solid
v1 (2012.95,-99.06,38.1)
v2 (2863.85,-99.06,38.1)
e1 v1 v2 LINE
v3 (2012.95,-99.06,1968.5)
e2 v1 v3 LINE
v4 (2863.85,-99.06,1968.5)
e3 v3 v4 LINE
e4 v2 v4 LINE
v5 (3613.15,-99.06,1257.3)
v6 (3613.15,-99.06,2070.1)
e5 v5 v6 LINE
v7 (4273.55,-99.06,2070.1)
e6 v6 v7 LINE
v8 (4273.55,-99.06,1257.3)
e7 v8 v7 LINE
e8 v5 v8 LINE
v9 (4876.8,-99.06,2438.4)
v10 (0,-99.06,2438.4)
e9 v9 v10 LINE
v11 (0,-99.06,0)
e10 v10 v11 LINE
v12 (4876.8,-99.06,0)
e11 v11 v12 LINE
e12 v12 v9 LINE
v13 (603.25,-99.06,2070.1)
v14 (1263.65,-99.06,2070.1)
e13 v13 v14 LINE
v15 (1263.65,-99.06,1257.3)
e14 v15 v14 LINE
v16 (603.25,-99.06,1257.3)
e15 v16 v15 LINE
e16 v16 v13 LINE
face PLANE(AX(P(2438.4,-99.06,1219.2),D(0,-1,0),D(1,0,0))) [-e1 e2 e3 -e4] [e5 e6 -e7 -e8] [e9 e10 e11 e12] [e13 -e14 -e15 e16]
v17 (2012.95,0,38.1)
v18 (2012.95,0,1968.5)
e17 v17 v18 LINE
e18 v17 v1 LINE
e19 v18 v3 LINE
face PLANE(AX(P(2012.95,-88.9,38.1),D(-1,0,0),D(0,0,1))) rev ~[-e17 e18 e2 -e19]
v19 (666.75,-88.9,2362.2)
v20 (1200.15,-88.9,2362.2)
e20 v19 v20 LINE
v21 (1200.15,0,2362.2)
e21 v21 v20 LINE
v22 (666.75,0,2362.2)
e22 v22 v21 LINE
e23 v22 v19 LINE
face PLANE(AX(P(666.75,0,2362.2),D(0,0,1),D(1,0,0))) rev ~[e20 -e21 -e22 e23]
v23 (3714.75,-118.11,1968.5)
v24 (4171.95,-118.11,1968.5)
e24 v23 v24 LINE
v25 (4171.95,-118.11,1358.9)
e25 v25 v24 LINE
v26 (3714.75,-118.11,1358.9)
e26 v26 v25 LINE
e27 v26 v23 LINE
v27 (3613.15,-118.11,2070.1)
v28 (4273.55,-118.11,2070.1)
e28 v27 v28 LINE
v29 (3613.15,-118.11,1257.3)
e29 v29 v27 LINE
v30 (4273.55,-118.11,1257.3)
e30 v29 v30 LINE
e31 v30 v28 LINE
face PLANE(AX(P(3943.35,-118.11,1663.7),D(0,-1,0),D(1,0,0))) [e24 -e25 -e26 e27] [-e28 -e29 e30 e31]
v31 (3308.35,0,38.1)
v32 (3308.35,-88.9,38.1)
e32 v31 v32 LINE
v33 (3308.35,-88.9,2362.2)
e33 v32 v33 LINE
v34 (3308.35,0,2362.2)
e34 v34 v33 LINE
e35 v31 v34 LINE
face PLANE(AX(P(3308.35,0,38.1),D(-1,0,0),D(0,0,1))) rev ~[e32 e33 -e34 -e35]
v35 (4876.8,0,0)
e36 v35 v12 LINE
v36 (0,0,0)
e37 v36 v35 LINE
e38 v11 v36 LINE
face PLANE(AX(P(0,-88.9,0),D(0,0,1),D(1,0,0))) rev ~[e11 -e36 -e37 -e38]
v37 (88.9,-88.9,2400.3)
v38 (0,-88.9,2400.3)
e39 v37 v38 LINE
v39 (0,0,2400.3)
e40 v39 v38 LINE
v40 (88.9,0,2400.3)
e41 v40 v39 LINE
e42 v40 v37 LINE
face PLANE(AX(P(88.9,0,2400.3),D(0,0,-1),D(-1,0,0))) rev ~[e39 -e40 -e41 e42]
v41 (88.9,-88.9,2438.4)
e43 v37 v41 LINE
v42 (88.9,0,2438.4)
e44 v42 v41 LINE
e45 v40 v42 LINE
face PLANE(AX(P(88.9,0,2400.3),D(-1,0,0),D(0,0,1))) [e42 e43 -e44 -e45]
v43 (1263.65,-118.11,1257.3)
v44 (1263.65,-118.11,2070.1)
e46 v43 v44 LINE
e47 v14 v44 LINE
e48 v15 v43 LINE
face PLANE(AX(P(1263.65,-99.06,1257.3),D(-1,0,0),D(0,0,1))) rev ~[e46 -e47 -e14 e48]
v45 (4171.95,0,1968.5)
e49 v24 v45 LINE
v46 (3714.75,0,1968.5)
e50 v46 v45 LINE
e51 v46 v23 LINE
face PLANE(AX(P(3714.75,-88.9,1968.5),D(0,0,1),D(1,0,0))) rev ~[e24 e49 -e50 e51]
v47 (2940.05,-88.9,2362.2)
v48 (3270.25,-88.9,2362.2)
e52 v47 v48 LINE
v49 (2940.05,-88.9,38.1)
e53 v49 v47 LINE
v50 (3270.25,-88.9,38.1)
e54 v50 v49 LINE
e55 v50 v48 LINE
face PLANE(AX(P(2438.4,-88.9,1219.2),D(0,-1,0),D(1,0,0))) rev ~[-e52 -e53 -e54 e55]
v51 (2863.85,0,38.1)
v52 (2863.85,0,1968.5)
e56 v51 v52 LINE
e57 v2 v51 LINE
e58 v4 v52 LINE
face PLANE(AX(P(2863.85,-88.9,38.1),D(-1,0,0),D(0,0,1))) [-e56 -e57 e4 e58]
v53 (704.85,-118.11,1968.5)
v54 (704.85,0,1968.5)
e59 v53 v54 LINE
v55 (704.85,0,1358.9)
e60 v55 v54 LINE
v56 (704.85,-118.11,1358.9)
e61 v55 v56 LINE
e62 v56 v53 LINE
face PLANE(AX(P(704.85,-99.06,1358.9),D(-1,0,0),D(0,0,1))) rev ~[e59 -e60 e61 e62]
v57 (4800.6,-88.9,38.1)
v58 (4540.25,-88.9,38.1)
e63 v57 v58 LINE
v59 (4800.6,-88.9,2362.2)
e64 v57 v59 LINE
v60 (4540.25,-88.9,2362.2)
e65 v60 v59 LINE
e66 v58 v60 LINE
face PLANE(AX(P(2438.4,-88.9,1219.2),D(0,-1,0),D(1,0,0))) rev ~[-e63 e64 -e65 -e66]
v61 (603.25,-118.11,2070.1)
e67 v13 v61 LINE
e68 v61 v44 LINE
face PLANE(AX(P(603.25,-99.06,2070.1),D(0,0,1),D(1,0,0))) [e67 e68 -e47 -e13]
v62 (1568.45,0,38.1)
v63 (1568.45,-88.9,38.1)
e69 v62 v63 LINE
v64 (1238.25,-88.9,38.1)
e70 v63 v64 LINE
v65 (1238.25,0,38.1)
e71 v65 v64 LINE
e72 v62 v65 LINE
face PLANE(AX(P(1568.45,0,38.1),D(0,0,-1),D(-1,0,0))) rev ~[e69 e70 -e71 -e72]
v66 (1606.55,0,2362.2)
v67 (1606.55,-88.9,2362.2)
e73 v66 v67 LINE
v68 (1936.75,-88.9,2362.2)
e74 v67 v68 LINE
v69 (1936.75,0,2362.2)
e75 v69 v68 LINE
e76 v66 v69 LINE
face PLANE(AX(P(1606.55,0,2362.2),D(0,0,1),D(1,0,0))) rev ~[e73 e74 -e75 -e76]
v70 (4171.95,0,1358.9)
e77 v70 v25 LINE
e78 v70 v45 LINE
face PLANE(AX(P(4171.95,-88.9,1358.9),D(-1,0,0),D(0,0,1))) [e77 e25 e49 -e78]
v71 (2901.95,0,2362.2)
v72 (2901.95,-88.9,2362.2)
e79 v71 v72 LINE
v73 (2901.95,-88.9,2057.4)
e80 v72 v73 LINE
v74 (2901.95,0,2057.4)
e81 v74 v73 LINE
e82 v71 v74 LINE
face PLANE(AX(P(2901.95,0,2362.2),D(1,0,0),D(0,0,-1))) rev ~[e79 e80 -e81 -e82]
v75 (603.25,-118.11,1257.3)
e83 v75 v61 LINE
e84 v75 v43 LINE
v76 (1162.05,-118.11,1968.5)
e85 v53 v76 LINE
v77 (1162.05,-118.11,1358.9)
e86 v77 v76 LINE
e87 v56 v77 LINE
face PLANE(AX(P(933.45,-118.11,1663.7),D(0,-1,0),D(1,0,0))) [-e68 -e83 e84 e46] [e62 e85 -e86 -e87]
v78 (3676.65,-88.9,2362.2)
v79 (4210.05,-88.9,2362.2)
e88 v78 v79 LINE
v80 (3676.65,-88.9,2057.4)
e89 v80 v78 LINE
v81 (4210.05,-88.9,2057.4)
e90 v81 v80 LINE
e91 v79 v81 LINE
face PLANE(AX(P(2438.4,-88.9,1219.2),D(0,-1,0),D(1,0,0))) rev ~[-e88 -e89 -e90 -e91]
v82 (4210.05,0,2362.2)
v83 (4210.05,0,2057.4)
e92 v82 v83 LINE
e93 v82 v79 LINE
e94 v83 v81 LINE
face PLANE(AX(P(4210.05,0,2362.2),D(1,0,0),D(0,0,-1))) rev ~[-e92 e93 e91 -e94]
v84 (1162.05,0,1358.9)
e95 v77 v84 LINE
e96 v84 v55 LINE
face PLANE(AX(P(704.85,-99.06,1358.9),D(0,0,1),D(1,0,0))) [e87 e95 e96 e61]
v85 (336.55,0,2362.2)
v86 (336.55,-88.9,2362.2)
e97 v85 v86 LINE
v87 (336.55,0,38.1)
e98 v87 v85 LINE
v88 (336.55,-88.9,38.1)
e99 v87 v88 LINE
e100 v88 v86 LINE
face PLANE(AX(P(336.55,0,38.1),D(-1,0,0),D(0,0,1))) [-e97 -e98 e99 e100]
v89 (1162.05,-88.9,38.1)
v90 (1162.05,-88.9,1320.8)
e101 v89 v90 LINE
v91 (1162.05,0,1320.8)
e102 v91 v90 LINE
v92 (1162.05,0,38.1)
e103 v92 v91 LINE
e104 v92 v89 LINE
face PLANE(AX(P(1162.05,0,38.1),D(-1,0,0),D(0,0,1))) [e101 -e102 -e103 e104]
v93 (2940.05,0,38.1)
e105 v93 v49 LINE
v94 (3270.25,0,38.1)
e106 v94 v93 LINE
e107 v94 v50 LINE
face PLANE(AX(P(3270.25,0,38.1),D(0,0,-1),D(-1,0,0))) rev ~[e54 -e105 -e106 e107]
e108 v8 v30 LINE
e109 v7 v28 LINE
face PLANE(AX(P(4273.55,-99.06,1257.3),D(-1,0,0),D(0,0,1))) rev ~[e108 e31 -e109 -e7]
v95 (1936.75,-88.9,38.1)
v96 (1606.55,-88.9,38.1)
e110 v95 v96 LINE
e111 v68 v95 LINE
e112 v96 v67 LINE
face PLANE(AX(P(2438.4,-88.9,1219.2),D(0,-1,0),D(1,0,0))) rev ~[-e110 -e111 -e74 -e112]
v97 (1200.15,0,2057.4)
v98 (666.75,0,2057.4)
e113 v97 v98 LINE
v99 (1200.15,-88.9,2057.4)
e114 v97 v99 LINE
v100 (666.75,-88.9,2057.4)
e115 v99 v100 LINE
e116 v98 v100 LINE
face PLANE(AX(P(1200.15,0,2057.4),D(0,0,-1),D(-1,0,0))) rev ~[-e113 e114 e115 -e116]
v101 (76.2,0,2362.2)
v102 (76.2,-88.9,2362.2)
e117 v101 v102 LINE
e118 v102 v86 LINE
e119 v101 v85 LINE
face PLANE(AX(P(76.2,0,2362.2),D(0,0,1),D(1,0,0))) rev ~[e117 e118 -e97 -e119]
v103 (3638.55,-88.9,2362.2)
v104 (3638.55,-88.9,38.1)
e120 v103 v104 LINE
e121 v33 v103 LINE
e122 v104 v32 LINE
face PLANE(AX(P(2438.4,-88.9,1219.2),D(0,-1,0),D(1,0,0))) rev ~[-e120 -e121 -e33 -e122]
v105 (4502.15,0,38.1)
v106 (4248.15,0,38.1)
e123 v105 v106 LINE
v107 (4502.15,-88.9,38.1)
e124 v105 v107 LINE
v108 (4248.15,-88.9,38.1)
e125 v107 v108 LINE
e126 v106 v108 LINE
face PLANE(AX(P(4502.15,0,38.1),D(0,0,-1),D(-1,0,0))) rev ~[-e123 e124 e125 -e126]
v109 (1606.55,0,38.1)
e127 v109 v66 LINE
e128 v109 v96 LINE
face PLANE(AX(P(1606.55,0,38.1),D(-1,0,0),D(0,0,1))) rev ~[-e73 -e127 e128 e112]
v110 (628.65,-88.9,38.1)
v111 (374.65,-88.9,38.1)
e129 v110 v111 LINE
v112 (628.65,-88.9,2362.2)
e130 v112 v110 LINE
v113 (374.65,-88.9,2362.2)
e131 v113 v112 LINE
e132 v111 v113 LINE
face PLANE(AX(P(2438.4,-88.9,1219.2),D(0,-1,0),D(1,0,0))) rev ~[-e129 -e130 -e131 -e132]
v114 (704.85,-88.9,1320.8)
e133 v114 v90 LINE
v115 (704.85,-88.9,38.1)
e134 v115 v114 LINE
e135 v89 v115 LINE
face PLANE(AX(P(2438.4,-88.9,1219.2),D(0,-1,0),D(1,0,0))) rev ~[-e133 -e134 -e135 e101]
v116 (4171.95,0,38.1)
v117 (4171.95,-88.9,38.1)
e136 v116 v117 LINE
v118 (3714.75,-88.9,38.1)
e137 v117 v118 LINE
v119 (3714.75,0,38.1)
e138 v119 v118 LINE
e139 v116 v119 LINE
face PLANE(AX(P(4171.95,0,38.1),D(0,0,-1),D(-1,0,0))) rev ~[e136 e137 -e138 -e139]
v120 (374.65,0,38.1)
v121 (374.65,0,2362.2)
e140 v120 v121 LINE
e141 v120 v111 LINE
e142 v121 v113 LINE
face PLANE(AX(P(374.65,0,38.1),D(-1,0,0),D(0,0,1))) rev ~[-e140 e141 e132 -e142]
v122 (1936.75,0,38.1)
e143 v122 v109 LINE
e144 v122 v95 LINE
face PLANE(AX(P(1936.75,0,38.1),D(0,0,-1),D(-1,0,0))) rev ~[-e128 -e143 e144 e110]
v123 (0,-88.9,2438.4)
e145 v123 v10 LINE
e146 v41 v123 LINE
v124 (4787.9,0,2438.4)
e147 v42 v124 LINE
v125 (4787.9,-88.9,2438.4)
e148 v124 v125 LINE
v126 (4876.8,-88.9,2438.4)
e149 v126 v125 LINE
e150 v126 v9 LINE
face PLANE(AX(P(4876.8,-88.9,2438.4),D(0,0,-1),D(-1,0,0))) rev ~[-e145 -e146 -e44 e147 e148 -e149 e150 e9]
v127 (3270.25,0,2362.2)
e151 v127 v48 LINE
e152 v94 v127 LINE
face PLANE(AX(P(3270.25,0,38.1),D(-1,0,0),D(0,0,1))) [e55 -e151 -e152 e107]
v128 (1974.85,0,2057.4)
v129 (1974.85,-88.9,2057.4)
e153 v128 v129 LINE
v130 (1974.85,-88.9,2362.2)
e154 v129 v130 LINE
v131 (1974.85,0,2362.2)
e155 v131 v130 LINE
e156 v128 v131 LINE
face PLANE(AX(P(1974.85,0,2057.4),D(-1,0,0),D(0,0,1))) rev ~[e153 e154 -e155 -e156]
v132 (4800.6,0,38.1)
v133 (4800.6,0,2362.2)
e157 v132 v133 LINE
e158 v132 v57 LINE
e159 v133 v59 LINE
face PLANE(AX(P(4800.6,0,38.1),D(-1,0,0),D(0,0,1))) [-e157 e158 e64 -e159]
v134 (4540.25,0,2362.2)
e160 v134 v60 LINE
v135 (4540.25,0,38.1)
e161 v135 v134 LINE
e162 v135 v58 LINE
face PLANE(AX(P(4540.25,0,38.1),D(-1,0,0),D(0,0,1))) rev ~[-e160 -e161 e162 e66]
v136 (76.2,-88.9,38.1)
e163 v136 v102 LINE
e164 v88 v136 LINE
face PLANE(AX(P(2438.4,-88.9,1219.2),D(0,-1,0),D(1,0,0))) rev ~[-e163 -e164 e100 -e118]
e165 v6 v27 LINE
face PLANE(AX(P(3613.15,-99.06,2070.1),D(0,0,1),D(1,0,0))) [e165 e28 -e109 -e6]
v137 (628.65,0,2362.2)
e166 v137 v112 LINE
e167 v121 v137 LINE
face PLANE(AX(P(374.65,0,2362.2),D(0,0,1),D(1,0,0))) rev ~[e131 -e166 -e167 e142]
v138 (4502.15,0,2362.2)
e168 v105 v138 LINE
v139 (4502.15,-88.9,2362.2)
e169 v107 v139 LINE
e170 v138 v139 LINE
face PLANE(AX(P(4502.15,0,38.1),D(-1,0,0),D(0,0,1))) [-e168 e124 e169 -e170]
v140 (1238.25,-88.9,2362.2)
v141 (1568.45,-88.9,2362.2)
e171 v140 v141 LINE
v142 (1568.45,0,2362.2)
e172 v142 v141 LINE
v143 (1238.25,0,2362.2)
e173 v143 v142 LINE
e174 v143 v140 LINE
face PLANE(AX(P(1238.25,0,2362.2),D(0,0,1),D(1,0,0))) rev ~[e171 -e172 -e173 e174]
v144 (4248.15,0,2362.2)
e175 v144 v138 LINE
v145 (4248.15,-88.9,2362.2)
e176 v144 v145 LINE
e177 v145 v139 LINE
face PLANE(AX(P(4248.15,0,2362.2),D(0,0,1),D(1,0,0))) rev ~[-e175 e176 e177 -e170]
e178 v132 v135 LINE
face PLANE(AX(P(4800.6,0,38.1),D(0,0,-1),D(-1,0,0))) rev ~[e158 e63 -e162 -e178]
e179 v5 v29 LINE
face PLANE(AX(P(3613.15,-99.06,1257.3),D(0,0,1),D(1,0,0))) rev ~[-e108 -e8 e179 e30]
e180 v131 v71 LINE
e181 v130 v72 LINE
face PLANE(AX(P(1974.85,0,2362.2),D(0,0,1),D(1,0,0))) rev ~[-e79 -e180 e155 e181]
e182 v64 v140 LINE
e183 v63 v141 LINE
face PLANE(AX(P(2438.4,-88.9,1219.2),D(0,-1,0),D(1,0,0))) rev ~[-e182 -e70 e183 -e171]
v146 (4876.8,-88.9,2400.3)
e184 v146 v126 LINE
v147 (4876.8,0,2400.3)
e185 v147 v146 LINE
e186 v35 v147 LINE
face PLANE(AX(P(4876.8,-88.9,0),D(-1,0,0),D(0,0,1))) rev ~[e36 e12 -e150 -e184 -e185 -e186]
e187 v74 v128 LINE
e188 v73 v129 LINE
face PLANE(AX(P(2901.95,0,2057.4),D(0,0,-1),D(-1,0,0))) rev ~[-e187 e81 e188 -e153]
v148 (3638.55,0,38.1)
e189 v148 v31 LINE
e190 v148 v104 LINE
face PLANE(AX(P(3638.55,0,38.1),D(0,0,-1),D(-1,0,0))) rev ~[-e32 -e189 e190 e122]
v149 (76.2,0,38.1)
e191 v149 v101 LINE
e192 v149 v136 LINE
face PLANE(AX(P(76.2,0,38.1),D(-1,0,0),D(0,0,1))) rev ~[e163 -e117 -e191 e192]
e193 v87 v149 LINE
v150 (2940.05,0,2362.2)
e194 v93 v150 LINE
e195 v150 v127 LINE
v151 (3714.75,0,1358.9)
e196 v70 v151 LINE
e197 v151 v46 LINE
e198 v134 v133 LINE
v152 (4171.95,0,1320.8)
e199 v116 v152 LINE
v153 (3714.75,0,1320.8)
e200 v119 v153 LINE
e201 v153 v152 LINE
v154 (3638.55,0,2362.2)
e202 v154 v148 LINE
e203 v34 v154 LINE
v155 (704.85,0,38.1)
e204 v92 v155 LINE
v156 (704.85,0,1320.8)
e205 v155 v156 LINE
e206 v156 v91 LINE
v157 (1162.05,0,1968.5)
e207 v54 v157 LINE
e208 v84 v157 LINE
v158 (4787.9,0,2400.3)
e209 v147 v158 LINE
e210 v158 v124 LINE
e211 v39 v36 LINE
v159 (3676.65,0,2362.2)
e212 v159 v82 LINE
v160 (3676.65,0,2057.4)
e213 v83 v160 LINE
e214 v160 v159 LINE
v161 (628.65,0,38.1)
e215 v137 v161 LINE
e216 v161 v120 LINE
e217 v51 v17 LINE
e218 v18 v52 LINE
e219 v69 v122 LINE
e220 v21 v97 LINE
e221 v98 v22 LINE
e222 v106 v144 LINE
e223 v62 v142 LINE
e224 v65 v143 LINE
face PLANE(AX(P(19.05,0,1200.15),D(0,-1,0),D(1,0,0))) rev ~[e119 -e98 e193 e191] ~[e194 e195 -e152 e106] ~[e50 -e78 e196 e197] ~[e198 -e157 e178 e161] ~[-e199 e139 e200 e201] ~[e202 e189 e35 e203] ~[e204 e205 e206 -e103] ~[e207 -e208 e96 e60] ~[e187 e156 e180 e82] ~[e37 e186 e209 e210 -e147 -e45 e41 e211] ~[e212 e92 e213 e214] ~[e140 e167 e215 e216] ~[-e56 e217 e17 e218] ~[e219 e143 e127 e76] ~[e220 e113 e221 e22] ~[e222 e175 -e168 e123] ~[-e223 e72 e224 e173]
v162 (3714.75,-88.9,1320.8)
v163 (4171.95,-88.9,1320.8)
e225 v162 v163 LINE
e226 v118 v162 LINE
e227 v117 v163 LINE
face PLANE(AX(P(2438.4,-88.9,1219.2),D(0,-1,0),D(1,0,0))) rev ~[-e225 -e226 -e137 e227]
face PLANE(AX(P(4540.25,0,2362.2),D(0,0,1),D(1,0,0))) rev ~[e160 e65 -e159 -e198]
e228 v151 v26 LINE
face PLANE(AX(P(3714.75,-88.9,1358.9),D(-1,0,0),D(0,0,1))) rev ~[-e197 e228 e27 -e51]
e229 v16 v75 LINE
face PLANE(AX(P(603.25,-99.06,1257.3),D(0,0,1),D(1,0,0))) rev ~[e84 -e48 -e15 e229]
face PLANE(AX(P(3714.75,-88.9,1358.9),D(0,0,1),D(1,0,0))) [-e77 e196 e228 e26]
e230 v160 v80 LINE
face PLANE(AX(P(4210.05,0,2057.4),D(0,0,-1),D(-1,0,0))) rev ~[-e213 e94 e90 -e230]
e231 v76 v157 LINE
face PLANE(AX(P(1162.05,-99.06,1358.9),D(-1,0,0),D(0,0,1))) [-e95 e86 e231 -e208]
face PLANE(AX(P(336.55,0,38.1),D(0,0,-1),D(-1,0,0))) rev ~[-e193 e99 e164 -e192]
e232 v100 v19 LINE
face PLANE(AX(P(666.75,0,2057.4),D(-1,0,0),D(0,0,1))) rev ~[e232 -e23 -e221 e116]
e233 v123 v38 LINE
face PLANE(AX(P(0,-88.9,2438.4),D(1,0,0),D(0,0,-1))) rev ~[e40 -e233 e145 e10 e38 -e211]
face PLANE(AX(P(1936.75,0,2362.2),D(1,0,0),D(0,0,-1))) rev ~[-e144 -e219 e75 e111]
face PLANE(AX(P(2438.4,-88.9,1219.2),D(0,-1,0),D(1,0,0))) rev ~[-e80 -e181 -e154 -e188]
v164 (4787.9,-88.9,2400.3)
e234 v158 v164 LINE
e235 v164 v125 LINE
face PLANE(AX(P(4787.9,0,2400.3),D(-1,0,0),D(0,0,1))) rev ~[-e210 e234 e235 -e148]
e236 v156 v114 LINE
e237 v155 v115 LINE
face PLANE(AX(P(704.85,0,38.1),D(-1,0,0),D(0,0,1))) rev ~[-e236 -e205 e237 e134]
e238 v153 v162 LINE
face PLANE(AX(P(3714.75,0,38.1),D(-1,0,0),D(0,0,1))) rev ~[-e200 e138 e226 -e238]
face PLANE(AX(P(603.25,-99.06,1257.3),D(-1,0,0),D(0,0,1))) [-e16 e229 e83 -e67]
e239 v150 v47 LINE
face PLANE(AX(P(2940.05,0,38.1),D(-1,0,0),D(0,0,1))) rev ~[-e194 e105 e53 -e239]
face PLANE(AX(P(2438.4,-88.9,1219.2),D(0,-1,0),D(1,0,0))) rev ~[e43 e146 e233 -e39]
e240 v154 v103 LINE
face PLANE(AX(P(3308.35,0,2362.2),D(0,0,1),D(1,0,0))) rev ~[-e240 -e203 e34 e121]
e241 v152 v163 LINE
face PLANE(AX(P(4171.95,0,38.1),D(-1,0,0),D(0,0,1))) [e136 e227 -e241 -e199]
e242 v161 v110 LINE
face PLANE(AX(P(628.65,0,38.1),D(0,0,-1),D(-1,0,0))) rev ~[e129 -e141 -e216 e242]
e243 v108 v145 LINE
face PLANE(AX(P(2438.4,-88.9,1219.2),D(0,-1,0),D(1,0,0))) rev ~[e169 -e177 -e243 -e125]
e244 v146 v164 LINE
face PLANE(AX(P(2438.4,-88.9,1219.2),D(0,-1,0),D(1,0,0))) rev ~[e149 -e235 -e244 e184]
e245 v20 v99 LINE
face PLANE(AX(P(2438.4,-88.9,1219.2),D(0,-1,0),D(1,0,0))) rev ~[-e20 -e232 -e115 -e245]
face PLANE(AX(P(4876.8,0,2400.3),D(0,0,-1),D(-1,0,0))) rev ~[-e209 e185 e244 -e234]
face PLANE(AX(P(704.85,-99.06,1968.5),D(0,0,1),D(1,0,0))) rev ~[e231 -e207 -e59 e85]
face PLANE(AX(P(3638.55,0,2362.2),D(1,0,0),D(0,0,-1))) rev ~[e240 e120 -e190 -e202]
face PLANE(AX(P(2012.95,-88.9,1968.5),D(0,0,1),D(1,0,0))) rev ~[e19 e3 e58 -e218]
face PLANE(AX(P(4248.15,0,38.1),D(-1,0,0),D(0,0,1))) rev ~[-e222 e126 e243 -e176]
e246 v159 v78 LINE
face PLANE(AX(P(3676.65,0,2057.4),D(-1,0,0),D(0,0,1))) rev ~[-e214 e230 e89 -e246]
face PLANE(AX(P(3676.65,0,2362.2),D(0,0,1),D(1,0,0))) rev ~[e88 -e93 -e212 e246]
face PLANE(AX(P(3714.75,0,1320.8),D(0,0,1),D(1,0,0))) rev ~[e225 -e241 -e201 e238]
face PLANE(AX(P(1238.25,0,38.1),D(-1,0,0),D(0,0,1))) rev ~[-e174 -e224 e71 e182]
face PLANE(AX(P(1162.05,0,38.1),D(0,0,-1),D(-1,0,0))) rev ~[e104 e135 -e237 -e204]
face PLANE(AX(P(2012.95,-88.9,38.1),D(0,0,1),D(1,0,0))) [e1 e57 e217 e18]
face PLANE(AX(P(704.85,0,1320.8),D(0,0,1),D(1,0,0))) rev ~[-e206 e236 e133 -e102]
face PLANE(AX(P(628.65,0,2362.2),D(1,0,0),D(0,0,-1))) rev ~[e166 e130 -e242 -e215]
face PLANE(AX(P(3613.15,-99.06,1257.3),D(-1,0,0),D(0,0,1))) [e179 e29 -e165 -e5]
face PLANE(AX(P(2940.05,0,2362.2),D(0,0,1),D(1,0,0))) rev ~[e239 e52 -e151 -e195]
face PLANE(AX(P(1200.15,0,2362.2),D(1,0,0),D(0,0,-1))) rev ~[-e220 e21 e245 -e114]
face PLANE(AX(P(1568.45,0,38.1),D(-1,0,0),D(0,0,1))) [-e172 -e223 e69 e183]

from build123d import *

# Parameters (mm, degrees)
F0_W     = 38.1
F0_H     = 2324.1
F0_H_2   = 609.6
F0_W_2   = 4699
F0_H_3   = 38.1
F0_H_4   = 1930.4
F0_H_5   = 1282.7
F1_DEPTH = 88.9
F2_W     = 850.9
F2_H     = 1930.4
F2_W_2   = 457.2
F2_H_2   = 609.6
F3_DEPTH = 10.16
F4_W     = 660.4
F4_H     = 812.8
F4_W_2   = 457.2
F4_H_2   = 609.6
F5_DEPTH = 19.05


# Not quite as in the source:
# - a feature names something its author has since deleted; it is built from what else it names


with BuildPart() as f1:
    # F0 (on Front) → F1 (new body)
    with BuildSketch(Plane.XZ):
        with Locations((19.05, 1200.15)):
            Rectangle(F0_W, F0_H)
        with Locations((57.15, 1200.15)):
            Rectangle(F0_W, F0_H)
        Polygon((0, 38.1), (0, 0), (4876.8, 0), (4876.8, 38.1), (4838.7, 38.1), (4800.6, 38.1), (4540.25, 38.1), (4502.15, 38.1), (4248.15, 38.1), (4210.05, 38.1), (4171.95, 38.1), (3714.75, 38.1), (3676.65, 38.1), (3638.55, 38.1), (3308.35, 38.1), (3270.25, 38.1), (2940.05, 38.1), (2901.95, 38.1), (2863.85, 38.1), (2012.95, 38.1), (1974.85, 38.1), (1936.75, 38.1), (1606.55, 38.1), (1568.45, 38.1), (1238.25, 38.1), (1200.15, 38.1), (1162.05, 38.1), (704.85, 38.1), (666.75, 38.1), (628.65, 38.1), (374.65, 38.1), (336.55, 38.1), (76.2, 38.1), (38.1, 38.1), align=None)
        with Locations((355.6, 1200.15)):
            Rectangle(F0_W, F0_H)
        Polygon((628.65, 2362.2), (628.65, 38.1), (666.75, 38.1), (666.75, 1320.8), (666.75, 1358.9), (666.75, 1968.5), (666.75, 2057.4), (666.75, 2362.2), align=None)
        Polygon((1200.15, 1320.8), (1200.15, 38.1), (1238.25, 38.1), (1238.25, 2362.2), (1200.15, 2362.2), (1200.15, 2057.4), (1200.15, 1968.5), (1200.15, 1358.9), align=None)
        Polygon((895.35, 2057.4), (666.75, 2057.4), (666.75, 1968.5), (704.85, 1968.5), (1162.05, 1968.5), (1200.15, 1968.5), (1200.15, 2057.4), (933.45, 2057.4), align=None)
        with Locations((685.8, 1663.7)):
            Rectangle(F0_W, F0_H_2)
        with Locations((1181.1, 1663.7)):
            Rectangle(F0_W, F0_H_2)
        Polygon((666.75, 1358.9), (666.75, 1320.8), (704.85, 1320.8), (1162.05, 1320.8), (1200.15, 1320.8), (1200.15, 1358.9), (1162.05, 1358.9), (704.85, 1358.9), align=None)
        Polygon((0, 2400.3), (0, 2362.2), (38.1, 2362.2), (76.2, 2362.2), (336.55, 2362.2), (374.65, 2362.2), (628.65, 2362.2), (666.75, 2362.2), (895.35, 2362.2), (933.45, 2362.2), (1200.15, 2362.2), (1238.25, 2362.2), (1568.45, 2362.2), (1606.55, 2362.2), (1936.75, 2362.2), (1974.85, 2362.2), (2901.95, 2362.2), (2940.05, 2362.2), (3270.25, 2362.2), (3308.35, 2362.2), (3638.55, 2362.2), (3676.65, 2362.2), (4210.05, 2362.2), (4248.15, 2362.2), (4502.15, 2362.2), (4540.25, 2362.2), (4800.6, 2362.2), (4838.7, 2362.2), (4876.8, 2362.2), (4876.8, 2400.3), (4787.9, 2400.3), (88.9, 2400.3), align=None)
        with Locations((2438.4, 2419.35)):
            Rectangle(F0_W_2, F0_H_3)
        with Locations((1587.5, 1200.15)):
            Rectangle(F0_W, F0_H)
        with Locations((4857.75, 1200.15)):
            Rectangle(F0_W, F0_H)
        with Locations((4819.65, 1200.15)):
            Rectangle(F0_W, F0_H)
        with Locations((3289.3, 1200.15)):
            Rectangle(F0_W, F0_H)
        Polygon((4171.95, 1320.8), (4210.05, 1320.8), (4210.05, 1358.9), (4171.95, 1358.9), (3714.75, 1358.9), (3676.65, 1358.9), (3676.65, 1320.8), (3714.75, 1320.8), align=None)
        with Locations((3695.7, 1663.7)):
            Rectangle(F0_W, F0_H_2)
        Polygon((3676.65, 2057.4), (3676.65, 2362.2), (3638.55, 2362.2), (3638.55, 38.1), (3676.65, 38.1), (3676.65, 1320.8), (3676.65, 1358.9), (3676.65, 1968.5), align=None)
        with Locations((4191, 1663.7)):
            Rectangle(F0_W, F0_H_2)
        Polygon((4210.05, 38.1), (4248.15, 38.1), (4248.15, 2362.2), (4210.05, 2362.2), (4210.05, 2057.4), (4210.05, 1968.5), (4210.05, 1358.9), (4210.05, 1320.8), align=None)
        Polygon((4210.05, 1968.5), (4210.05, 2057.4), (3676.65, 2057.4), (3676.65, 1968.5), (3714.75, 1968.5), (4171.95, 1968.5), align=None)
        with Locations((4521.2, 1200.15)):
            Rectangle(F0_W, F0_H)
        Polygon((1936.75, 2362.2), (1936.75, 38.1), (1974.85, 38.1), (1974.85, 1968.5), (1974.85, 2057.4), (1974.85, 2362.2), align=None)
        Polygon((2940.05, 38.1), (2940.05, 2362.2), (2901.95, 2362.2), (2901.95, 2057.4), (2901.95, 1968.5), (2901.95, 38.1), align=None)
        with Locations((1993.9, 1003.3)):
            Rectangle(F0_W, F0_H_4)
        Polygon((2901.95, 1968.5), (2901.95, 2057.4), (1974.85, 2057.4), (1974.85, 1968.5), (2012.95, 1968.5), (2863.85, 1968.5), align=None)
        with Locations((2882.9, 1003.3)):
            Rectangle(F0_W, F0_H_4)
        with Locations((3695.7, 679.45)):
            Rectangle(F0_W, F0_H_5)
        with Locations((4191, 679.45)):
            Rectangle(F0_W, F0_H_5)
        with Locations((685.8, 679.45)):
            Rectangle(F0_W, F0_H_5)
        with Locations((1181.1, 679.45)):
            Rectangle(F0_W, F0_H_5)
    extrude(amount=F1_DEPTH)

    # F2 (on face) → F3 (join)
    with BuildSketch(Plane.XZ.offset(88.9)):
        Polygon((0, 2400.3), (0, 0), (4876.8, 0), (4876.8, 2400.3), (4876.8, 2438.4), (4787.9, 2438.4), (88.9, 2438.4), (0, 2438.4), align=None)
        with Locations((2438.4, 1003.3)):
            Rectangle(F2_W, F2_H, mode=Mode.SUBTRACT)
        with Locations((933.45, 1663.7)):
            Rectangle(F2_W_2, F2_H_2, mode=Mode.SUBTRACT)
        with Locations((3943.35, 1663.7)):
            Rectangle(F2_W_2, F2_H_2, mode=Mode.SUBTRACT)
    extrude(amount=F3_DEPTH)

    # F4 (on face) → F5 (join)
    with BuildSketch(Plane.XZ.offset(99.06)):
        with Locations((933.45, 1663.7)):
            Rectangle(F4_W, F4_H)
        with Locations((933.45, 1663.7)):
            Rectangle(F4_W_2, F4_H_2, mode=Mode.SUBTRACT)
        with Locations((3943.35, 1663.7)):
            Rectangle(F4_W, F4_H)
        with Locations((3943.35, 1663.7)):
            Rectangle(F4_W_2, F4_H_2, mode=Mode.SUBTRACT)
    extrude(amount=F5_DEPTH)


solid = f1.part
